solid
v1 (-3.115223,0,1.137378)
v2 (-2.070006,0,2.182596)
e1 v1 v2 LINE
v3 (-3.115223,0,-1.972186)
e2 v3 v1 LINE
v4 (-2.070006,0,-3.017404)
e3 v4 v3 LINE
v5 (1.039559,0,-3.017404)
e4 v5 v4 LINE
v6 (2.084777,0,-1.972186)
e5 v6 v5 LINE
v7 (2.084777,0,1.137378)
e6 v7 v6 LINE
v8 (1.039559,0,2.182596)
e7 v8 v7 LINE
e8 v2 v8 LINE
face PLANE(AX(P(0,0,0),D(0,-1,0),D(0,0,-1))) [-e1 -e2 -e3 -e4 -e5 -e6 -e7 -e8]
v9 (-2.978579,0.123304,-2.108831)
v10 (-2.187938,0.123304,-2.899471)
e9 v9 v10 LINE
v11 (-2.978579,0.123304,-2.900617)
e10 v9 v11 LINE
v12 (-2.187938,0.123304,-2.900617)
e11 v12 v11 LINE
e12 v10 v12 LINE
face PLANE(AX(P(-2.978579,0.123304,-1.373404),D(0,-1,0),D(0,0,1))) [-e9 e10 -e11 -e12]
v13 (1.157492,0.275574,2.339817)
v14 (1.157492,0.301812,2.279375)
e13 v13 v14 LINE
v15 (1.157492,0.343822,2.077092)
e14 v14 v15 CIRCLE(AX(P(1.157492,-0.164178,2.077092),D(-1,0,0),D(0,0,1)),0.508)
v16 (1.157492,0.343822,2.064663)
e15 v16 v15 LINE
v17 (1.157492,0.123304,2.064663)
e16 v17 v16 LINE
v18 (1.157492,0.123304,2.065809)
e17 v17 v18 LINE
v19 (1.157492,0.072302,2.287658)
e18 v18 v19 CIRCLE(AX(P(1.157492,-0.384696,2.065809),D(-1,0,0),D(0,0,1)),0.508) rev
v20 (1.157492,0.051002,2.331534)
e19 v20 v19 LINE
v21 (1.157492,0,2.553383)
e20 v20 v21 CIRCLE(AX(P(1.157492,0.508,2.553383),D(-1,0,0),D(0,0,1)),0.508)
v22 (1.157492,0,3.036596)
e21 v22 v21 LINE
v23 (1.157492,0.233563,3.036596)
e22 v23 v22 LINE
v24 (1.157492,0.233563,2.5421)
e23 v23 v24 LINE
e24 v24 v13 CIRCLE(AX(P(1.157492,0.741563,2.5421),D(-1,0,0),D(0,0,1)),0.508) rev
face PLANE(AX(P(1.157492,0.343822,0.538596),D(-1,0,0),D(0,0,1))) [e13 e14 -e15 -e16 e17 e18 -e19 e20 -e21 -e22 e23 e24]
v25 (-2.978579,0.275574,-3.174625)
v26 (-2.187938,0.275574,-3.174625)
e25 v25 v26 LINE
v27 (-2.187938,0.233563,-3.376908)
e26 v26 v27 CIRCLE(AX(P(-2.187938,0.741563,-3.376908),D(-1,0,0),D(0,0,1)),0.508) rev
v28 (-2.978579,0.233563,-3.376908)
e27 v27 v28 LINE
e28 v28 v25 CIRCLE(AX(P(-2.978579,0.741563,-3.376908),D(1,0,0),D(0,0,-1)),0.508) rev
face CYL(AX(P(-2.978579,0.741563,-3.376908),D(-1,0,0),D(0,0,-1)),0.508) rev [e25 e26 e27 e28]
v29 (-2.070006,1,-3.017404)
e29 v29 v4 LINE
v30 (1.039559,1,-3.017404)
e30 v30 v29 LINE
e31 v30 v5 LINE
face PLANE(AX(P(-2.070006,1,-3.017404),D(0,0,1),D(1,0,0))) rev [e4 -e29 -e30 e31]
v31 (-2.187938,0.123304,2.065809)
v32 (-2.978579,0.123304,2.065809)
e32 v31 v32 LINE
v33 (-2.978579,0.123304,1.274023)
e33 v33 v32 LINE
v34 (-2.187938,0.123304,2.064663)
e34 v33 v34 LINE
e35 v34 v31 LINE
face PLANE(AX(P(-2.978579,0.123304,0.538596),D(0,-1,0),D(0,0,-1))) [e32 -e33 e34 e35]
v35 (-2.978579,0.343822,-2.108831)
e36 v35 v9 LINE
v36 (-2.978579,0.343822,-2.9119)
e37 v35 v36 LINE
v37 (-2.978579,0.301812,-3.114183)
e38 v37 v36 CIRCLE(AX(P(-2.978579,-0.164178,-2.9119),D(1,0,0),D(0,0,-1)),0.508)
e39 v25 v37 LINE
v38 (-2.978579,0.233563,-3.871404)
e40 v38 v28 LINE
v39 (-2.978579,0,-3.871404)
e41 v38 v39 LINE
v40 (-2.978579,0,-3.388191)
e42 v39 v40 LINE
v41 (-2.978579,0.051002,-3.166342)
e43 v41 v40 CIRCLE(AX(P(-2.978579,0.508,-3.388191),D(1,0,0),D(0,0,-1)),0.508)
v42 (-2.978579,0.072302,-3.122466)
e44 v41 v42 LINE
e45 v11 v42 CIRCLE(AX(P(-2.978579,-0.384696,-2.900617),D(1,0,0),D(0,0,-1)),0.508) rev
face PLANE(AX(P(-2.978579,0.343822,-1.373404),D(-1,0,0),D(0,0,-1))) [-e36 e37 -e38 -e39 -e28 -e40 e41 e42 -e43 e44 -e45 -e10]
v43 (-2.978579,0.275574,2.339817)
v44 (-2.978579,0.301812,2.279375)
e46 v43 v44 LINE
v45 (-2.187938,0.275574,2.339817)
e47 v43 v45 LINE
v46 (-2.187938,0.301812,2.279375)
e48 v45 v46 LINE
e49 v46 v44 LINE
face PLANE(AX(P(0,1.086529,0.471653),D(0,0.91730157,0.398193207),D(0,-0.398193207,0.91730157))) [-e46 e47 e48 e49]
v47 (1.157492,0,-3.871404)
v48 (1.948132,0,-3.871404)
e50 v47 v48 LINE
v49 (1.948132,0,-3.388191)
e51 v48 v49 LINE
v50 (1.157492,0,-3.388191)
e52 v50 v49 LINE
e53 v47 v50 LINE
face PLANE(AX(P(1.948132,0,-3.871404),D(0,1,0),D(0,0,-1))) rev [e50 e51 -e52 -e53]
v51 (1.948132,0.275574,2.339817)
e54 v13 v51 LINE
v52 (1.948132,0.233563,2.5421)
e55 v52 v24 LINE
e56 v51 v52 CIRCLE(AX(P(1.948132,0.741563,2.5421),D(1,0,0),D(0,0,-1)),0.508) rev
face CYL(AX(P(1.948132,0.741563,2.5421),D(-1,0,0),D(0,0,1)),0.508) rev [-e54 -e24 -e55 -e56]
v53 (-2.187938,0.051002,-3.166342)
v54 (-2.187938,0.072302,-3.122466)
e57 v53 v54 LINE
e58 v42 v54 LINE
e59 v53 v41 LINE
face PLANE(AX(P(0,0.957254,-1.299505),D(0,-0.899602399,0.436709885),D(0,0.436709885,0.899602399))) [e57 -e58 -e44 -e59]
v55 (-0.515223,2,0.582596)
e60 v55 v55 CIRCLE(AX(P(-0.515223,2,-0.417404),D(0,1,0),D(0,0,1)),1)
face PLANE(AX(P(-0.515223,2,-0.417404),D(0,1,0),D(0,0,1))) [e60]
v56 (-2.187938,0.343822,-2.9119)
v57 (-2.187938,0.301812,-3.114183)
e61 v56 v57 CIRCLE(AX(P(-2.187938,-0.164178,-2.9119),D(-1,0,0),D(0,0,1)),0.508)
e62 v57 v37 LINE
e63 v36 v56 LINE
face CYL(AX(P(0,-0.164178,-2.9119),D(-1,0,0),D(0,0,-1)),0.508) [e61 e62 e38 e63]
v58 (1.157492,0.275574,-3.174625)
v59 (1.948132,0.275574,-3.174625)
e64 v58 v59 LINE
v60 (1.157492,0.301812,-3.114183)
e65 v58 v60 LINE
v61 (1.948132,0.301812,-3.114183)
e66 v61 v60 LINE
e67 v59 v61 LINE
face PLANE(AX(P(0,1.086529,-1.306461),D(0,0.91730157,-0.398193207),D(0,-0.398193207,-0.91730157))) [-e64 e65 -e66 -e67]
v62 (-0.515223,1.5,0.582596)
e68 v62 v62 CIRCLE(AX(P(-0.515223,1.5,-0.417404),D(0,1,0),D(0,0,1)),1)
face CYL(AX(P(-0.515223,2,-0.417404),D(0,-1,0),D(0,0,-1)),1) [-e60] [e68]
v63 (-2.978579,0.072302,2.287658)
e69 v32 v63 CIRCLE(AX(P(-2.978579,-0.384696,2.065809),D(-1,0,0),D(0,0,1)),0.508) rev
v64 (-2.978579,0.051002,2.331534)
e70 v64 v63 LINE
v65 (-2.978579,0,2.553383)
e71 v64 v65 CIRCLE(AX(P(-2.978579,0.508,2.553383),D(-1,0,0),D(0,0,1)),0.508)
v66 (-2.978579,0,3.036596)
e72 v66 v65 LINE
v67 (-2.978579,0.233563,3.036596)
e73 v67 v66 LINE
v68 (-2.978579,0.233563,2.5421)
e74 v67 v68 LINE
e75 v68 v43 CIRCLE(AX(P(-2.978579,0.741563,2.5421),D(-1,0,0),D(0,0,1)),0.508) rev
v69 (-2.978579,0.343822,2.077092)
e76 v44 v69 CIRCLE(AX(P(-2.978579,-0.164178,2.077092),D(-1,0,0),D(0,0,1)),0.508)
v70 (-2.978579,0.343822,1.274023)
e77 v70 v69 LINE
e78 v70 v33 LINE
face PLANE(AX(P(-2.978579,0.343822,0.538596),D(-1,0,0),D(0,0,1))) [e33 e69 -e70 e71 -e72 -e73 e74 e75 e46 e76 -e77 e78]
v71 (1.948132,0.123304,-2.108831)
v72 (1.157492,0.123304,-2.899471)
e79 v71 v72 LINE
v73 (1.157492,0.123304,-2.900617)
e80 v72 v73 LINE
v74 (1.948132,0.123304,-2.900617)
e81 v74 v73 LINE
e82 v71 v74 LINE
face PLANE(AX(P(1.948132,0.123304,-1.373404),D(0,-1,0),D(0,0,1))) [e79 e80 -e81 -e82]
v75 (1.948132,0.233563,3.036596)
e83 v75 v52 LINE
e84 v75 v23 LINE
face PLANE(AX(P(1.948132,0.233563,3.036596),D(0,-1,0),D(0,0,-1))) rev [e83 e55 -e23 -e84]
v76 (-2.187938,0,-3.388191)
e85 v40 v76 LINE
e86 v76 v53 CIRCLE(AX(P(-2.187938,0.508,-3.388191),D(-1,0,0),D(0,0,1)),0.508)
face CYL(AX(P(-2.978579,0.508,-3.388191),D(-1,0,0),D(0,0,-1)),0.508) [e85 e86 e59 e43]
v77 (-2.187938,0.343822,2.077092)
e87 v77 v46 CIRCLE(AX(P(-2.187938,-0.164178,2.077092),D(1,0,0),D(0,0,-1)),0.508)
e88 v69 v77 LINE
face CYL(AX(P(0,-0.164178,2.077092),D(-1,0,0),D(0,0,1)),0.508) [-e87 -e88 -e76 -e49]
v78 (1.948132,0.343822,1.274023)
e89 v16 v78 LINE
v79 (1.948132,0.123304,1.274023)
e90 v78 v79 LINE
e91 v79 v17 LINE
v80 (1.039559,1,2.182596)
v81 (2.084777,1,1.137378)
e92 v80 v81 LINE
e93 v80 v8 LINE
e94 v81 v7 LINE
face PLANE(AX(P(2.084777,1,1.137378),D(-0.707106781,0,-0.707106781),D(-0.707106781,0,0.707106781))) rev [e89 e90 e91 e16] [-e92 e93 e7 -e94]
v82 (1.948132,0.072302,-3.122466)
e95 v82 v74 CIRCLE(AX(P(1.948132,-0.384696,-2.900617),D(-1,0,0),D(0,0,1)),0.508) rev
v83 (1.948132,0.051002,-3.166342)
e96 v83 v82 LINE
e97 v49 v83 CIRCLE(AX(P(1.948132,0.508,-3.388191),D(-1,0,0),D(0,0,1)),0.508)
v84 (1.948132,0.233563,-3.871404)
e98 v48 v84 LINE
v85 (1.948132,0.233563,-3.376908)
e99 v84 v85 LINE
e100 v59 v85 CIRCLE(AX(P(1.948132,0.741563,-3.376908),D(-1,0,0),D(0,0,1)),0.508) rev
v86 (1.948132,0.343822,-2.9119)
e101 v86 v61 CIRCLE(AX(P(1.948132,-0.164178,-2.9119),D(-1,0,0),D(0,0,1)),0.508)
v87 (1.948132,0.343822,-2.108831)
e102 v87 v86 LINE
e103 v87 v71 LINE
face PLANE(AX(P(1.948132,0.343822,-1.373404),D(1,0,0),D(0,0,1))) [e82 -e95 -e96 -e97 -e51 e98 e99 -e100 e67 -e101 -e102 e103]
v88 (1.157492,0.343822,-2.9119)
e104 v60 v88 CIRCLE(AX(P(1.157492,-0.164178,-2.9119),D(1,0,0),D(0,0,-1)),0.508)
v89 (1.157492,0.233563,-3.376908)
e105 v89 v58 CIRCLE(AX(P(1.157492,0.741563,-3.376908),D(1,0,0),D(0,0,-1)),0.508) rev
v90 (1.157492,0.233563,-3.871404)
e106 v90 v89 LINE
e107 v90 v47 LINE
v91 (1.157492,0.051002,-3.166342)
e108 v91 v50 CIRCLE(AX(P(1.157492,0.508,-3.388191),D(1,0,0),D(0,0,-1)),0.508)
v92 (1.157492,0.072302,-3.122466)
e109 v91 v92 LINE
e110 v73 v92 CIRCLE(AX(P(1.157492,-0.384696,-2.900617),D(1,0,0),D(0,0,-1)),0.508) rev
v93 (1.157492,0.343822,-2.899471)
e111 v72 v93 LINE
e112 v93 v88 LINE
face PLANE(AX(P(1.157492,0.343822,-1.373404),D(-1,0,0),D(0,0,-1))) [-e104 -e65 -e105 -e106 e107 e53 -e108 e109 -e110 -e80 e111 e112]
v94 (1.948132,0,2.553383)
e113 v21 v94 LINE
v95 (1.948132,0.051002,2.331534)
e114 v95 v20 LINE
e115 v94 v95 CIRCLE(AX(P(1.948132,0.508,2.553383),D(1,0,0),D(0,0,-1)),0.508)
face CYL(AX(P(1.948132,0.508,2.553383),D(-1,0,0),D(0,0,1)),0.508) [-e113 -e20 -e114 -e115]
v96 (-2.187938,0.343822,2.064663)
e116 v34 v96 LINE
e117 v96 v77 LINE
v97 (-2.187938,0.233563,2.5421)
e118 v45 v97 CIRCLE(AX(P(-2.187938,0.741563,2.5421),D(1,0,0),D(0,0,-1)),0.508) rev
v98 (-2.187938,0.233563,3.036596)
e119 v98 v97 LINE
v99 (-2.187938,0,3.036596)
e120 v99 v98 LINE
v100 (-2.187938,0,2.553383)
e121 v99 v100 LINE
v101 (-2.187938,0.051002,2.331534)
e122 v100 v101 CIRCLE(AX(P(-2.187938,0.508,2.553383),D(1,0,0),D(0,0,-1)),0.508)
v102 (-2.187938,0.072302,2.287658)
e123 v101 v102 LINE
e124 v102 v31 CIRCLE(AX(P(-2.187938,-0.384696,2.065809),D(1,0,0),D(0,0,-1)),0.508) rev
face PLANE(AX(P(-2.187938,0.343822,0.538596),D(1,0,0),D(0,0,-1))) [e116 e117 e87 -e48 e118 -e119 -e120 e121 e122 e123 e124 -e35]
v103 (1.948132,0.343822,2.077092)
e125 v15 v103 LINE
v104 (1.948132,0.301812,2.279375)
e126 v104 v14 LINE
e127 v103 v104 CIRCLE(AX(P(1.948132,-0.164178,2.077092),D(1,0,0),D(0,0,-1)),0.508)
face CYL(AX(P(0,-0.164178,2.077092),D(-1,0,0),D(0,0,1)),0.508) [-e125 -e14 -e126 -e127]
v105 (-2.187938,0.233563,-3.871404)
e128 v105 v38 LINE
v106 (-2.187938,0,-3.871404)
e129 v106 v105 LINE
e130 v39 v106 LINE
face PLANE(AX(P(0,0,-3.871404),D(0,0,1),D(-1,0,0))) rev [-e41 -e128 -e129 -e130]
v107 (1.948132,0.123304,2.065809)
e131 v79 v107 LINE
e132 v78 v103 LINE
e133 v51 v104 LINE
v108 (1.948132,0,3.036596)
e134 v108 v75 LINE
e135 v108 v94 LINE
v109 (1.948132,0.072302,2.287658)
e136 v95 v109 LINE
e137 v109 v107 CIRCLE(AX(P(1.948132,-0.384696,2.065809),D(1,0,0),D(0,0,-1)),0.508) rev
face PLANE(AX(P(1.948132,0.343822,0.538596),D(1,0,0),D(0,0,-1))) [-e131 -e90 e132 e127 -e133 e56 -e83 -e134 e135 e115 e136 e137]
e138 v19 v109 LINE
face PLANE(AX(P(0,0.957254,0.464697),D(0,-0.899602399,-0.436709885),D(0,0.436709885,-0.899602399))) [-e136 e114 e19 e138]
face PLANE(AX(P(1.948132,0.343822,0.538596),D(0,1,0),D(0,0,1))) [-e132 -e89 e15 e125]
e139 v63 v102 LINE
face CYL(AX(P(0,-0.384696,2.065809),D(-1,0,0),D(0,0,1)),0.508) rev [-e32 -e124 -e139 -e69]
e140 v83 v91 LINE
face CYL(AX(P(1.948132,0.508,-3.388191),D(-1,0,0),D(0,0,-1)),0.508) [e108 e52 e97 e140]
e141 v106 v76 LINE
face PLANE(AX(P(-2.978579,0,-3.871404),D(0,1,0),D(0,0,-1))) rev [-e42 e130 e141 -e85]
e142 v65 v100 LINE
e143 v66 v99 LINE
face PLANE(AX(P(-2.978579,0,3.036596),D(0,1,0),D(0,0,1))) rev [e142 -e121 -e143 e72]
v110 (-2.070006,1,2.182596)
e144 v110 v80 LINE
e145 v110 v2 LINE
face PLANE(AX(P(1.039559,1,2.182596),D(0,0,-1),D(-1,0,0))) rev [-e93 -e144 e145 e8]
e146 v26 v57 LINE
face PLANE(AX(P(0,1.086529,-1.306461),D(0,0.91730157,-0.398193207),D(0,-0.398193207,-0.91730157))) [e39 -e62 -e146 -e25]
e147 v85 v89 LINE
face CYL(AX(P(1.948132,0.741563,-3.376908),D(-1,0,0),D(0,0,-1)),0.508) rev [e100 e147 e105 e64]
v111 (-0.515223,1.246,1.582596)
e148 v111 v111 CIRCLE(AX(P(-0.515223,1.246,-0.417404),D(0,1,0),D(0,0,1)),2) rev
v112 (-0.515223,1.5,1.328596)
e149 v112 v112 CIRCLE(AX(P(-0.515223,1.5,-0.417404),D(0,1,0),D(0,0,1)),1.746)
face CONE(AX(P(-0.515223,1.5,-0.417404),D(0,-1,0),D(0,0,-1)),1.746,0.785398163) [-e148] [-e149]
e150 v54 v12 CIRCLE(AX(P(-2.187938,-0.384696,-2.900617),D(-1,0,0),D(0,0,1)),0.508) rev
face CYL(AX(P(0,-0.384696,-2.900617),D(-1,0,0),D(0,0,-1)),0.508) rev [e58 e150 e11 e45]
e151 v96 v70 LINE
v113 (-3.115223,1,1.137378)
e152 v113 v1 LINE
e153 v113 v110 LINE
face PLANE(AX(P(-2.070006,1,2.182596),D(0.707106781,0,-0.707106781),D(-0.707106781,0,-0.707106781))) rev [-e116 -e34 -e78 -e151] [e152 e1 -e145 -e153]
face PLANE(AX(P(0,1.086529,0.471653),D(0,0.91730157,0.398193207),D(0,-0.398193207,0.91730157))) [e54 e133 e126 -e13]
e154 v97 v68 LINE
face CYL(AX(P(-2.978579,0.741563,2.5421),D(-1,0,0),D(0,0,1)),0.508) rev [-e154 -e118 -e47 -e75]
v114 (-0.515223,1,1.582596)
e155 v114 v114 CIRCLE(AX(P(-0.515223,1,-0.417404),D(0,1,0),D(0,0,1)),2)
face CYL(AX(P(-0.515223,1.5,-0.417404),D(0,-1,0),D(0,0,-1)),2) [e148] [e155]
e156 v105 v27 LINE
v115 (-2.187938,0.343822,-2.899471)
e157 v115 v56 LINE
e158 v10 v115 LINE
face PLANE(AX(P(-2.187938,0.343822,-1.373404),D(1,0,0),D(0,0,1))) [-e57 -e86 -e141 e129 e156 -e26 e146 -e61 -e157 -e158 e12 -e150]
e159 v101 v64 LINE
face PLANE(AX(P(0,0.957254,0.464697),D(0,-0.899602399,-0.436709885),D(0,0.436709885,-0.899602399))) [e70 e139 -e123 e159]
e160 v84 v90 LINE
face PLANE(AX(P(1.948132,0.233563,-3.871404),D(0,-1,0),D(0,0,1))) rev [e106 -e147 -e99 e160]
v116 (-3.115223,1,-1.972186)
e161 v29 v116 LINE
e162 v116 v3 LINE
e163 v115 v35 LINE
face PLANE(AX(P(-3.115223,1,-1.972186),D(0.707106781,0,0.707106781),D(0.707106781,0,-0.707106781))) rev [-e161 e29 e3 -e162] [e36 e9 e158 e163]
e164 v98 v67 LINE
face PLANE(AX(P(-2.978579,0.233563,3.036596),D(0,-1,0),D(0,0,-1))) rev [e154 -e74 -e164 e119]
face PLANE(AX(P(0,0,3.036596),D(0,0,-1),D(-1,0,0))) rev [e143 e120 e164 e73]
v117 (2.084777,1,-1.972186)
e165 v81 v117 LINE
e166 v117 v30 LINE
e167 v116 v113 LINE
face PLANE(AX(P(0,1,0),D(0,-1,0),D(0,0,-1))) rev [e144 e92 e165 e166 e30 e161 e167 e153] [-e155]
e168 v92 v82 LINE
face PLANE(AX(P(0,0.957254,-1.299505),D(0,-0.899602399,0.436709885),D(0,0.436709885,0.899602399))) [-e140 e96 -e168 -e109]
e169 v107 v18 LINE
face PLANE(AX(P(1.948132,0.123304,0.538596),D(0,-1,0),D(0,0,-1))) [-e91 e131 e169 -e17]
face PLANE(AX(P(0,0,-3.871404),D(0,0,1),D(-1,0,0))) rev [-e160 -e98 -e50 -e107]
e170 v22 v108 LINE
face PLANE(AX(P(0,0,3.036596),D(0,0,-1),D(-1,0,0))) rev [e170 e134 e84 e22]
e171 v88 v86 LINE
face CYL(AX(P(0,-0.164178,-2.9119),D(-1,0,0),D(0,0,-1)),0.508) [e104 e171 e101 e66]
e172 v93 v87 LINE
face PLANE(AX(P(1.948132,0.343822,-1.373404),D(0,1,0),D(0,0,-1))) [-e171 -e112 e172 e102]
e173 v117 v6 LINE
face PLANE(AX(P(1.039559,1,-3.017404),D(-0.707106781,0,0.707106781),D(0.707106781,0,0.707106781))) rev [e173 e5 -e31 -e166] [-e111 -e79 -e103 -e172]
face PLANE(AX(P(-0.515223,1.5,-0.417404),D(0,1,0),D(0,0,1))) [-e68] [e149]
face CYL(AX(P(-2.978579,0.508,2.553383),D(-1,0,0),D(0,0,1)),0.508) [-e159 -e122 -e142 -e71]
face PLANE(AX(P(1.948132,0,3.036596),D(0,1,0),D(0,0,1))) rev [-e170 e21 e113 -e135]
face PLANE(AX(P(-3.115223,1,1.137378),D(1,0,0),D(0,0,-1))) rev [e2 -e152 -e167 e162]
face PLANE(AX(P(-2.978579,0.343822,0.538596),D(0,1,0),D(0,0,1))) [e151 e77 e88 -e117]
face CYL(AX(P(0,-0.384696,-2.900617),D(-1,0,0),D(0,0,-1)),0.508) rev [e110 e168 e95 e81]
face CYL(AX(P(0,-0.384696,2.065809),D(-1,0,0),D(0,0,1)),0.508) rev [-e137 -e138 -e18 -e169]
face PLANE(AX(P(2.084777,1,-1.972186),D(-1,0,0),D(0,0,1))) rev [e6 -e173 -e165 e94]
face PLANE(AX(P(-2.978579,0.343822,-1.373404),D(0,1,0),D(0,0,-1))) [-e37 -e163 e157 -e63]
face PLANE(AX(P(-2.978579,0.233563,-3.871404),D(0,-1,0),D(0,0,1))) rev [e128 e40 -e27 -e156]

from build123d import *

# Parameters (mm, degrees)
BOSS_EXTRUDE1_DEPTH   = 1
SKETCH4_R             = 2
BOSS_EXTRUDE3_DEPTH   = 0.5
SKETCH2_R             = 1
BOSS_EXTRUDE2_DEPTH   = 0.5
CHAMFER1_SIZE         = 0.254
SKETCH5_W             = 0.790640215
SKETCH5_H             = 0.2205187
BOSS_EXTRUDE4_DEPTH   = 1.644
BOSS_EXTRUDE4_2_DEPTH = 1.644
SKETCH7_W             = 0.790640215
SKETCH7_H             = 0.233563057
BOSS_EXTRUDE5_DEPTH   = 0.6
BOSS_EXTRUDE5_2_DEPTH = 0.6
LOFT1_START           = 1.157491545
LOFT1_DEPTH           = 0.790640215
LOFT2_START           = -2.978578696
LOFT2_DEPTH           = 0.790640215
FILLET1_R             = 0.508


# Read off the part's stored shape, not the designer's step: Loft1, Loft2, Mirror1
with BuildPart() as part:
    # Sketch1 → Boss-Extrude1 (new body)
    with BuildSketch(Plane(origin=(0, 0, 0), x_dir=(1, 0, 0), z_dir=(0, 1, 0))):
        Polygon((-3.115223468, 1.972186251), (-2.070005732, 3.017403987), (1.039558796, 3.017403987), (2.084776532, 1.972186251), (2.084776532, -1.137378277), (1.039558796, -2.182596013), (-2.070005732, -2.182596013), (-3.115223468, -1.137378277), align=None)
    extrude(amount=BOSS_EXTRUDE1_DEPTH)

    # Sketch4 → Boss-Extrude3 (add)
    with BuildSketch(Plane(origin=(0, 1, 0), x_dir=(1, 0, 0), z_dir=(0, 1, 0))):
        with Locations(Location((-0.515223468, 0.417403987, 0), (0, 0, 270))):
            Circle(SKETCH4_R)
    extrude(amount=BOSS_EXTRUDE3_DEPTH)

    # Sketch2 → Boss-Extrude2 (add)
    with BuildSketch(Plane(origin=(0, 1.5, 0), x_dir=(1, 0, 0), z_dir=(0, 1, 0))):
        with Locations(Location((-0.515223468, 0.417403987, 0), (0, 0, 270))):
            Circle(SKETCH2_R)
    extrude(amount=BOSS_EXTRUDE2_DEPTH)

    # Chamfer1
    chamfer1_edges = [part.edges().sort_by_distance(p)[0] for p in [
        (-0.515223468, 1.5, -2.417403987),
    ]]
    chamfer(chamfer1_edges, length=CHAMFER1_SIZE)



with BuildPart() as body_2:
    # Sketch5 → Boss-Extrude4 (new body)
    with BuildSketch(Plane.XY.offset(2.182596013)):
        with Locations((-2.583258589, 0.233563057)):
            Rectangle(SKETCH5_W, SKETCH5_H)
    extrude(amount=-BOSS_EXTRUDE4_DEPTH)



with BuildPart() as body_3:
    # Sketch5 → Boss-Extrude4 2 (new body)
    with BuildSketch(Plane.XY.offset(2.182596013)):
        with Locations((1.552811652, 0.233563057)):
            Rectangle(SKETCH5_W, SKETCH5_H)
    extrude(amount=-BOSS_EXTRUDE4_2_DEPTH)


with BuildPart() as body_4:
    # Sketch7 → Boss-Extrude5 (new body)
    with BuildSketch(Plane.XY.offset(2.436596013)):
        with Locations((-2.583258589, 0.116781529)):
            Rectangle(SKETCH7_W, SKETCH7_H)
    extrude(amount=BOSS_EXTRUDE5_DEPTH)


with BuildPart() as body_5:
    # Sketch7 → Boss-Extrude5 2 (new body)
    with BuildSketch(Plane.XY.offset(2.436596013)):
        with Locations((1.552811652, 0.116781529)):
            Rectangle(SKETCH7_W, SKETCH7_H)
    extrude(amount=BOSS_EXTRUDE5_2_DEPTH)


with BuildPart() as part_1:
    add(part.part)

    add(body_3.part)  # Loft1 merges body 3

    add(body_5.part)  # Loft1 merges body 5
    # Loft1 outline → Loft1 (add)
    with BuildSketch(Plane.YZ.offset(LOFT1_START)):
        Polygon((0.233563057, 2.436596013), (0, 2.436596013), (0.123303707, 2.182596013), (0.343822407, 2.182596013), align=None)
    extrude(amount=LOFT1_DEPTH)


with BuildPart() as body_2_1:
    add(body_2.part)

    add(body_4.part)  # Loft2 merges body 4

    add(part_1.part)  # Loft2 merges part
    # Loft2 outline → Loft2 (add)
    with BuildSketch(Plane.YZ.offset(LOFT2_START)):
        Polygon((0.123303707, 2.182596013), (0.343822407, 2.182596013), (0.233563057, 2.436596013), (0, 2.436596013), align=None)
    extrude(amount=LOFT2_DEPTH)

    # Fillet1
    fillet1_edges = [body_2_1.edges().sort_by_distance(p)[0] for p in [
        (1.552811653, 0.343822407, 2.182596013),
        (-2.583258588, 0.343822407, 2.182596013),
        (-2.583258588, 0, 2.436596013),
        (1.552811653, 0, 2.436596013),
        (-2.583258588, 0.233563057, 2.436596013),
        (1.552811653, 0.233563057, 2.436596013),
        (-2.583258588, 0.123303707, 2.182596013),
        (1.552811653, 0.123303707, 2.182596013),
    ]]
    fillet(fillet1_edges, radius=FILLET1_R)

    # Mirror1: body 2 across plane


with BuildPart() as body_2_2:
    add(body_2_1.part)
    add(body_2_1.part.mirror(Plane.XY.offset(-0.417403987)))


solid = body_2_2.part
